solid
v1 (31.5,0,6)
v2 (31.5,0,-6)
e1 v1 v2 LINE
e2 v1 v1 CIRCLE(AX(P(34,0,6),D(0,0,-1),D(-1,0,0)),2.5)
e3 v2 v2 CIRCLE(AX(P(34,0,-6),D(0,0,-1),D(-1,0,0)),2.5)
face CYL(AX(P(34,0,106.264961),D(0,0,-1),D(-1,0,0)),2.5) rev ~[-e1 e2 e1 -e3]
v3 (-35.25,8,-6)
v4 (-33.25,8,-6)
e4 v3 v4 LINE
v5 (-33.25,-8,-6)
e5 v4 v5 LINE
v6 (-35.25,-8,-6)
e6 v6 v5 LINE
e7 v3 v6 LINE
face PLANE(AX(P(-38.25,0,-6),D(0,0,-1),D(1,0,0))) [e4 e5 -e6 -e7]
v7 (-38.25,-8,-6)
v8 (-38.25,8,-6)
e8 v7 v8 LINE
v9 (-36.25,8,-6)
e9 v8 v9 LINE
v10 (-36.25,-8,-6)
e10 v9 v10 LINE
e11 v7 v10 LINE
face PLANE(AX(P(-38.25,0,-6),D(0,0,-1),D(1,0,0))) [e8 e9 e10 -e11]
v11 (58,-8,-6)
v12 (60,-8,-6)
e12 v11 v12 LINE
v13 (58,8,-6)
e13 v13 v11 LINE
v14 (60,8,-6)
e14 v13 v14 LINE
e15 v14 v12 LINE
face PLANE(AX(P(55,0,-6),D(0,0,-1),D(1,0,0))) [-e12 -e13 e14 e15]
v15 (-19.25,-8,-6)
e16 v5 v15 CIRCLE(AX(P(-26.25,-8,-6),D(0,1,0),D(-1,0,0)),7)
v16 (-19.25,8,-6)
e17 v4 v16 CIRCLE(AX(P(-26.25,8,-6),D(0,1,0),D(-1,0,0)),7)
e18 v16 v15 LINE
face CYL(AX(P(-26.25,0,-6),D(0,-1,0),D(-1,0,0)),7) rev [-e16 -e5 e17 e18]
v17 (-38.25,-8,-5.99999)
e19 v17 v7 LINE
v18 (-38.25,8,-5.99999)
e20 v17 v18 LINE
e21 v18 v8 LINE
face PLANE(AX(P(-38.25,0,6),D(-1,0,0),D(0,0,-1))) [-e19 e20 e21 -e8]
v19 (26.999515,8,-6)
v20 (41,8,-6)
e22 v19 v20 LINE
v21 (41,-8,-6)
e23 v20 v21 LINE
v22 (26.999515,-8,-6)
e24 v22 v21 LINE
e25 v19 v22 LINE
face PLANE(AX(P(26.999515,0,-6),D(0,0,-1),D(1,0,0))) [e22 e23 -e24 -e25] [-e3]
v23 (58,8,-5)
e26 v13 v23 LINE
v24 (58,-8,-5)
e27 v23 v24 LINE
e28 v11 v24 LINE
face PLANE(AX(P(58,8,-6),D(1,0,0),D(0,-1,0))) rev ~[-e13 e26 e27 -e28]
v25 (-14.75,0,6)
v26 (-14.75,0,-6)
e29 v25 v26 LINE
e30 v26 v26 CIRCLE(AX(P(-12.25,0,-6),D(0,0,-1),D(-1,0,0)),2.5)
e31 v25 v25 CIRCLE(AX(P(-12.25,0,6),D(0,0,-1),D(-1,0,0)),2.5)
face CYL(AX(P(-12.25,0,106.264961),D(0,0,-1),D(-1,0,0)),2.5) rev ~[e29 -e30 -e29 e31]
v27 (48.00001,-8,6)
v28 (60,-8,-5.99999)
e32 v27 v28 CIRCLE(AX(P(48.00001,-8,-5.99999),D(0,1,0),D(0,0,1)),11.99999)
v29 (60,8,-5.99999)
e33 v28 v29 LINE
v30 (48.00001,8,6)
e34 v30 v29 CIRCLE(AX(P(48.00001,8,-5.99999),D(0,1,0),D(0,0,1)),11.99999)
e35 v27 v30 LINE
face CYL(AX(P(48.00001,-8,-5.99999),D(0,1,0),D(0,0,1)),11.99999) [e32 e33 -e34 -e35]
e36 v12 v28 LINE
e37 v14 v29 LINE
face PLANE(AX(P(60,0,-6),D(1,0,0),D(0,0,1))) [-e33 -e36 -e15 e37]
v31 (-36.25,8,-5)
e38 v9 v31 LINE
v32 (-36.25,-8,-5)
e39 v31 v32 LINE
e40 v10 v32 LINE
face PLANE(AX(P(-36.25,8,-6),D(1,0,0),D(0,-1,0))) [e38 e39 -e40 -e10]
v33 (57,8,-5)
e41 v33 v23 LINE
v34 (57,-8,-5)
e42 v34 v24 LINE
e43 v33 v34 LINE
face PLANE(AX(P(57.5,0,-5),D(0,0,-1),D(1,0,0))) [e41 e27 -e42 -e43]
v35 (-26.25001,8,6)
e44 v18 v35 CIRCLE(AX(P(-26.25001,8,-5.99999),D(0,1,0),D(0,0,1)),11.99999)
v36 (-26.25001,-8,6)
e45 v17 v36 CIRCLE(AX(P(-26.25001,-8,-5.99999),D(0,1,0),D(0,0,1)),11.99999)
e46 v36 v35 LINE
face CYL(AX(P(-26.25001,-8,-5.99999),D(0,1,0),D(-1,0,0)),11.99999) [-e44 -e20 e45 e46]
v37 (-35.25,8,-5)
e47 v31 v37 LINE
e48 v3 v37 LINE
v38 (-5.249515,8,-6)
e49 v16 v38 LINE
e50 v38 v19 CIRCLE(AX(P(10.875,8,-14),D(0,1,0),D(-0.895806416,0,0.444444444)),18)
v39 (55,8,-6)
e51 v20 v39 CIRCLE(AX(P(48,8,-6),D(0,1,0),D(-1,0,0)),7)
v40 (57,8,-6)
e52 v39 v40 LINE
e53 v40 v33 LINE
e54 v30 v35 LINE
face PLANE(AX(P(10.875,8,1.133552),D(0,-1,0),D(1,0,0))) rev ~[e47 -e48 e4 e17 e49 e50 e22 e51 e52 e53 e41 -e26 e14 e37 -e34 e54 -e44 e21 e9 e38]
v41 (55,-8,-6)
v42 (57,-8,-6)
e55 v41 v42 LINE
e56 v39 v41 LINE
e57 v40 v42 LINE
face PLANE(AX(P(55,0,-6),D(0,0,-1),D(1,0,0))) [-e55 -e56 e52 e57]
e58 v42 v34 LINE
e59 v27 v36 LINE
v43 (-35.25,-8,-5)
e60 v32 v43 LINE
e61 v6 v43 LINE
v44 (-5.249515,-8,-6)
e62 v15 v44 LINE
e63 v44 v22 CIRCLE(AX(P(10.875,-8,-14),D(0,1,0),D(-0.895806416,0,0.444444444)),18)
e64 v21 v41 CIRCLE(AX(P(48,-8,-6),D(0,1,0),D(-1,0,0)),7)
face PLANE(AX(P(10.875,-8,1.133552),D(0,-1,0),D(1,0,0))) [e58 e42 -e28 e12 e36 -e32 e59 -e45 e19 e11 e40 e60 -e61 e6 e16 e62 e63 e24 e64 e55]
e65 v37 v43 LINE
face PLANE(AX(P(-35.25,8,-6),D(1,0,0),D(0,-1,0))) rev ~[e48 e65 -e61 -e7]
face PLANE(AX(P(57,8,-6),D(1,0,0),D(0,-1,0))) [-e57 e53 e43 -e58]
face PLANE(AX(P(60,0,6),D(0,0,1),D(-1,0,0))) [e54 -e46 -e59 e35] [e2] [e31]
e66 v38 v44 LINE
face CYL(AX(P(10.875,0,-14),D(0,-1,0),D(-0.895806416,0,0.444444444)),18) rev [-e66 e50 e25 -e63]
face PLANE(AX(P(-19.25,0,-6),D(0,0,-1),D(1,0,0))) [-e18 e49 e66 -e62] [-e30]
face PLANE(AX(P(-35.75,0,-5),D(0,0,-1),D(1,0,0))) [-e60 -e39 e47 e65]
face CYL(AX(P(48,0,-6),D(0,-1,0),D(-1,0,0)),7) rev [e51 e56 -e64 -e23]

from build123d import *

# Parameters (mm, degrees)
F1_DEPTH = 8
F3_R     = 11.99999
F4_D     = 5
F5_W     = 1
F5_H     = 16
F6_DEPTH = 1


# Not quite as in the source:
# - a fillet or chamfer is up to 0.001 mm smaller than in the source, because OpenCascade refuses the exact size


with BuildPart() as f1:
    # F0 (on Front) → F1 (new body, symmetric)
    with BuildSketch(Plane.XZ):
        with BuildLine():
            Line((-38.25, -6), (-33.25, -6))
            ThreePointArc((-33.25, -6), (-26.25, 1), (-19.25, -6))
            Line((-19.25, -6), (-5.2495154966, -6))
            ThreePointArc((-5.2495154966, -6), (10.875, 4), (26.9995154966, -6))
            Line((26.9995154966, -6), (41, -6))
            ThreePointArc((41, -6), (48, 1), (55, -6))
            Line((55, -6), (60, -6))
            Line((60, -6), (60, 6))
            Line((60, 6), (-38.25, 6))
            Line((-38.25, 6), (-38.25, -6))
        make_face()
    extrude(amount=F1_DEPTH, both=True)

    # F3 (radius 12 in the source; OpenCascade refuses exactly that, so slightly less here)
    f3_edges = [f1.edges().sort_by_distance(p)[0] for p in [
        (-38.25, 0, 6),
        (60, 0, 6),
    ]]
    fillet(f3_edges, radius=F3_R)

    # F4 (through all)
    with Locations(Plane.XY.offset(6)):
        with Locations((-12.25, 0), (34, 0)):
            Hole(F4_D / 2)

    # F5 (on face) → F6 (cut)
    with BuildSketch(Plane(origin=(0, 0, -6), x_dir=(1, 0, 0), z_dir=(0, 0, -1))):
        with Locations((-35.75, 0)):
            Rectangle(F5_W, F5_H)
        with Locations((57.5, 0)):
            Rectangle(F5_W, F5_H)
    extrude(amount=-F6_DEPTH, mode=Mode.SUBTRACT)


solid = f1.part
